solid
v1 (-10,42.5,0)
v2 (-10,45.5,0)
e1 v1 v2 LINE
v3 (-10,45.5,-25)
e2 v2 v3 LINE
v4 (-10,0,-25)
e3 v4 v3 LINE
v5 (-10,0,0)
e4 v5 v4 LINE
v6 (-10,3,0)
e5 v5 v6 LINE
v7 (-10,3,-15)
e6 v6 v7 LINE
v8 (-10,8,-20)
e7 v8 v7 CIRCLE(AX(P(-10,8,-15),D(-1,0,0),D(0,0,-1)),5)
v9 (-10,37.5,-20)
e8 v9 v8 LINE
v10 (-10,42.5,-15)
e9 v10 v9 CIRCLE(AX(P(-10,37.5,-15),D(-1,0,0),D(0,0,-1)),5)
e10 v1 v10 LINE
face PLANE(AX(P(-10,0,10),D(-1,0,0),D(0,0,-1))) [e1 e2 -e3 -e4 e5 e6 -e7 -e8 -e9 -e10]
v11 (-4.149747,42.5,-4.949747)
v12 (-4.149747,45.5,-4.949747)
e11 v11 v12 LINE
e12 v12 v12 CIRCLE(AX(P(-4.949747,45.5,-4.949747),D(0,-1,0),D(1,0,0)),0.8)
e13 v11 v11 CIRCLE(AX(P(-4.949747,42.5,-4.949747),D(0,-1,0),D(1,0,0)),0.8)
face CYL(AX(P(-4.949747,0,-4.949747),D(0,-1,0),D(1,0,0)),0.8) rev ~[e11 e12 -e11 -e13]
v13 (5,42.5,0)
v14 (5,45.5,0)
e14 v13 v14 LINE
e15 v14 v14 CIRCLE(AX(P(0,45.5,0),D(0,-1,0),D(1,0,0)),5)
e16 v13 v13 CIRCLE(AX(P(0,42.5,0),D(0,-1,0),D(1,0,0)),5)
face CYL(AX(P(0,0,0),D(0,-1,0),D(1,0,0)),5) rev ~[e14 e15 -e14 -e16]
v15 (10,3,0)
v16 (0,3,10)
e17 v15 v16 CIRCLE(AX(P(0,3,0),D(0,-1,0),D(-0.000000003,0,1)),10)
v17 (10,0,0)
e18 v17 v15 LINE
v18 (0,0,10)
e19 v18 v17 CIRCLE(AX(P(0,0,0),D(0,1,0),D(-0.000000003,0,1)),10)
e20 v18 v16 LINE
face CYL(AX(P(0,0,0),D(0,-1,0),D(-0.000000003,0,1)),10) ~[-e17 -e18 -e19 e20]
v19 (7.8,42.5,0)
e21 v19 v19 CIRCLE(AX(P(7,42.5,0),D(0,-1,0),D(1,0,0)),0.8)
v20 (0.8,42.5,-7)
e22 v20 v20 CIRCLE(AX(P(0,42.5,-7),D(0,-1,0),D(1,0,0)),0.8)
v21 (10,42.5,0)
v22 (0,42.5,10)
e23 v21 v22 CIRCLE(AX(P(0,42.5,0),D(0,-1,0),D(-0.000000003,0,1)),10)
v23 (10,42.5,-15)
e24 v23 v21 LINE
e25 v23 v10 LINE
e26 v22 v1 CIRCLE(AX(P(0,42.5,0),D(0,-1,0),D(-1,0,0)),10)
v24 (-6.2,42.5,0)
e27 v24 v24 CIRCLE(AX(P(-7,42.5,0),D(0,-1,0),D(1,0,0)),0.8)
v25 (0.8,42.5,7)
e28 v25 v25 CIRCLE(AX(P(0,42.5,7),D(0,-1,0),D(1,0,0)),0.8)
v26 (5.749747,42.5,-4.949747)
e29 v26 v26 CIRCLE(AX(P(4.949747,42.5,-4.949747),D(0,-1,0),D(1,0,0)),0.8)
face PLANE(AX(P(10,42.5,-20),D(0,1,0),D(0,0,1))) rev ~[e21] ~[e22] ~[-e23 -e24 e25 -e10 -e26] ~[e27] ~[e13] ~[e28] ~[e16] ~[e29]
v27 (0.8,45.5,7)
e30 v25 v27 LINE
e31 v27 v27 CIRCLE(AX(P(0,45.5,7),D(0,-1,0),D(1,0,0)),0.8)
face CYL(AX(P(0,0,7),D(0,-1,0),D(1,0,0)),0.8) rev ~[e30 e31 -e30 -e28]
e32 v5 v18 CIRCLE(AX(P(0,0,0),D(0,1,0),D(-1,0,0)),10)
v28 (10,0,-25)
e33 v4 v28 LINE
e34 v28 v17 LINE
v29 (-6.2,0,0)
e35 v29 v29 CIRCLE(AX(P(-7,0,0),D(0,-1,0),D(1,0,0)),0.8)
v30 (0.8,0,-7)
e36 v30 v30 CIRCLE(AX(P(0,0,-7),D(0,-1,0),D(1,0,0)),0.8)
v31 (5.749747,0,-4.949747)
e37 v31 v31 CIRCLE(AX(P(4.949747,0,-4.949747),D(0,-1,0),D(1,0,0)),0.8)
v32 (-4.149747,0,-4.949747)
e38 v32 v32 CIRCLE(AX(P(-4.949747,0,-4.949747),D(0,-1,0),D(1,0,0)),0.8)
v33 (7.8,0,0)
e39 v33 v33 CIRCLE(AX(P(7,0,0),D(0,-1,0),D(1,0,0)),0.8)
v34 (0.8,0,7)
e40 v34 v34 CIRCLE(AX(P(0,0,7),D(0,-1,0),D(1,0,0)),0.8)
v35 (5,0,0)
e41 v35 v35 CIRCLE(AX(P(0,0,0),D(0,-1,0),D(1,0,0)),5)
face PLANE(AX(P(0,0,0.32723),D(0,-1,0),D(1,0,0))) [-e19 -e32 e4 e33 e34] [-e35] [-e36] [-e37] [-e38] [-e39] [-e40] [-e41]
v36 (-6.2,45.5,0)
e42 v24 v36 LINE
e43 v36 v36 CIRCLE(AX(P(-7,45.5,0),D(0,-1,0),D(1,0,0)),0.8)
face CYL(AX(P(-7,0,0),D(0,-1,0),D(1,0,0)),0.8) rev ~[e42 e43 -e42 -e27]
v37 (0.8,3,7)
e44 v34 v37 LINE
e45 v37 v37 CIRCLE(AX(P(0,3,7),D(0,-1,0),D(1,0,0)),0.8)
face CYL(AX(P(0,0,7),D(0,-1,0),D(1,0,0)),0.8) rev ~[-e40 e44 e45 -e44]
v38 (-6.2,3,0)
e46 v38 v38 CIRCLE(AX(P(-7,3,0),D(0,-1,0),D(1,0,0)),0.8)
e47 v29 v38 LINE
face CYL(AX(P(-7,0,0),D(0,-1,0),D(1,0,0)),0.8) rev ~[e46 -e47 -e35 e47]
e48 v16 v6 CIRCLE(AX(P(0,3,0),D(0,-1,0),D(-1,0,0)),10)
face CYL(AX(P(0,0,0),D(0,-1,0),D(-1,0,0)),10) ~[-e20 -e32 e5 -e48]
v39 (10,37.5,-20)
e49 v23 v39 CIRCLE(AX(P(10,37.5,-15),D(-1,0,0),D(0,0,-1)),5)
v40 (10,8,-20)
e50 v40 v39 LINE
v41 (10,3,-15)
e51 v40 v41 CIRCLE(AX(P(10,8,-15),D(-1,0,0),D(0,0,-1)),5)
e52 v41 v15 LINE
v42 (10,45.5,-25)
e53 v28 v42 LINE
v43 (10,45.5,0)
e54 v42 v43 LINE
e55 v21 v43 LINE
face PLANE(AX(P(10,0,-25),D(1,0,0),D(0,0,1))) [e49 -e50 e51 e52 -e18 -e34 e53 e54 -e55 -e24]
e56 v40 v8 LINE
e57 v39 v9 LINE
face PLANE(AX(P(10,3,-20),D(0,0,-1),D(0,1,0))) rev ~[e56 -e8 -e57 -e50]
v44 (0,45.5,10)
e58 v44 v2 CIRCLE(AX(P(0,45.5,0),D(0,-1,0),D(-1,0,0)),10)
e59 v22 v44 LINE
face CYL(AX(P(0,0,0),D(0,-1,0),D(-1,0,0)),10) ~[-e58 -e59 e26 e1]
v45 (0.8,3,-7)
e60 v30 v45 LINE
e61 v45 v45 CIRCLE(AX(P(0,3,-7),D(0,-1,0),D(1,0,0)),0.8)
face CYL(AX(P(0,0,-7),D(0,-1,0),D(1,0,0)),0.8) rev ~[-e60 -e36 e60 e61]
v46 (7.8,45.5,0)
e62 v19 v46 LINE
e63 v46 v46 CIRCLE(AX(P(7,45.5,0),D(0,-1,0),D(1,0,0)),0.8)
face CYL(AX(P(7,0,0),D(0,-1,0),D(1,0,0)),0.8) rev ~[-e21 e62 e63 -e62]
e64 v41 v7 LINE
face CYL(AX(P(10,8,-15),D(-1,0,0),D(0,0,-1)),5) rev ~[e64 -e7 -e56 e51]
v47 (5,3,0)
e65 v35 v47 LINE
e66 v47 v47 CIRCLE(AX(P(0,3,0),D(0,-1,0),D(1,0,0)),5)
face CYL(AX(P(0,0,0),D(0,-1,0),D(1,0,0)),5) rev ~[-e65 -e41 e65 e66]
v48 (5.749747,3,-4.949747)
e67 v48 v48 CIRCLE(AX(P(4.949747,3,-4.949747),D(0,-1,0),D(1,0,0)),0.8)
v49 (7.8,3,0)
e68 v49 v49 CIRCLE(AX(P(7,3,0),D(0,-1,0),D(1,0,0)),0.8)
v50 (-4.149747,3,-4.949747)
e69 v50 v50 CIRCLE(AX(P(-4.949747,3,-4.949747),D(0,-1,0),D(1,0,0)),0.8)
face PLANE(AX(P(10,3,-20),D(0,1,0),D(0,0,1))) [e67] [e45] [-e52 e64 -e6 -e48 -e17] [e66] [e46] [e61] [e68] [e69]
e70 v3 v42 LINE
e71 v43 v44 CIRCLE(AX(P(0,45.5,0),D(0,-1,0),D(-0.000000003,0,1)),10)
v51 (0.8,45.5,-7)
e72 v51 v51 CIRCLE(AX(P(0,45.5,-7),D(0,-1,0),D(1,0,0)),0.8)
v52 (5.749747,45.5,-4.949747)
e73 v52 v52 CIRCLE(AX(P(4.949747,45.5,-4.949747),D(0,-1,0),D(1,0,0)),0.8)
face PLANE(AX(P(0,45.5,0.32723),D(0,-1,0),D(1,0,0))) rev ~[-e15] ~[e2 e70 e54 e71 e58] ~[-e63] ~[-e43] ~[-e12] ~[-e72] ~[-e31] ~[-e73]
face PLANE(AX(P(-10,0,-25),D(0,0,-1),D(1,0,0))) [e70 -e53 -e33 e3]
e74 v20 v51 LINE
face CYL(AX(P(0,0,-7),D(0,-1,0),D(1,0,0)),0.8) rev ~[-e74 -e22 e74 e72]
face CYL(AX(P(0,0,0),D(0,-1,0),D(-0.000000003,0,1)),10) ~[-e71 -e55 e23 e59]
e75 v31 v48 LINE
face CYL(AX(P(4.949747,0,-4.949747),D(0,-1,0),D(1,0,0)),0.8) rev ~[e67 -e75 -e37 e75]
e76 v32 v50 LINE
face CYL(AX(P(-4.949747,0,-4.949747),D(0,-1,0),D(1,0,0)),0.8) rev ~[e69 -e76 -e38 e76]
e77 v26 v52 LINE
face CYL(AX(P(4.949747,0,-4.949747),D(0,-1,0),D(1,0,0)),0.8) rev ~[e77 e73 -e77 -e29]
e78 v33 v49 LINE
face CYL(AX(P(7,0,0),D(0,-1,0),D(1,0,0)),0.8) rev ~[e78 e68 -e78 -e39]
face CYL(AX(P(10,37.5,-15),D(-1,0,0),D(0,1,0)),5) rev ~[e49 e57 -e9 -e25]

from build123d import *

# Parameters (mm, degrees)
F0_R     = 0.8
F0_R_2   = 5
F1_DEPTH = 45.5
F2_W     = 39.5
F2_H     = 30
F3_DEPTH = 20.001
F4_DEPTH = 45.501
F5_R     = 5


with BuildPart() as f1:
    # F0 (on Front) → F1 (new body)
    with BuildSketch(Plane.XZ):
        with BuildLine():
            ThreePointArc((-2.67e-08, 10), (-7.0710678213, 7.0710678024), (-10, 0))
            ThreePointArc((-10, 0), (0, -10), (10, 0))
            ThreePointArc((10, 0), (7.0710678024, 7.0710678213), (-2.67e-08, 10))
        make_face()
        with Locations((-7, 0)):
            Circle(F0_R, mode=Mode.SUBTRACT)
        with Locations((-4.9497474683, -4.9497474683)):
            Circle(F0_R, mode=Mode.SUBTRACT)
        with Locations((0, -7)):
            Circle(F0_R, mode=Mode.SUBTRACT)
        with Locations((4.9497474683, -4.9497474683)):
            Circle(F0_R, mode=Mode.SUBTRACT)
        Circle(F0_R_2, mode=Mode.SUBTRACT)
        with Locations((7, 0)):
            Circle(F0_R, mode=Mode.SUBTRACT)
        with Locations((0, 7)):
            Circle(F0_R, mode=Mode.SUBTRACT)
        with BuildLine():
            ThreePointArc((10, 0), (0, -10), (-10, 0))
            Line((-10, 0), (-10, -22))
            Line((-10, -22), (10, -22))
            Line((10, -22), (10, 0))
        make_face()
        Circle(F0_R_2)
        Polygon((10, -22), (-10, -22), (-10, -25), (0, -25), (10, -25), align=None)
        with BuildLine():
            ThreePointArc((-2.67e-08, 10), (7.0710678024, 7.0710678213), (10, 0))
            Line((10, 0), (10, 10))
            Line((10, 10), (-2.67e-08, 10))
        make_face()
        with BuildLine():
            Line((-10, 10), (-10, 0))
            ThreePointArc((-10, 0), (-7.0710678213, 7.0710678024), (-2.67e-08, 10))
            Line((-2.67e-08, 10), (-10, 10))
        make_face()
        with Locations((0, -7)):
            Circle(F0_R)
        with Locations((7, 0)):
            Circle(F0_R)
        with Locations((-4.9497474683, -4.9497474683)):
            Circle(F0_R)
        with Locations((-7, 0)):
            Circle(F0_R)
        with Locations((0, 7)):
            Circle(F0_R)
        with Locations((4.9497474683, -4.9497474683)):
            Circle(F0_R)
    extrude(amount=-F1_DEPTH)

    # F2 (on face) → F3 (cut, through all)
    with BuildSketch(Plane.YZ.offset(10)):
        with Locations((22.75, -5)):
            Rectangle(F2_W, F2_H)
    extrude(amount=-F3_DEPTH, mode=Mode.SUBTRACT)

    # F0 (on Front) → F4 (cut, through all)
    with BuildSketch(Plane.XZ):
        Circle(F0_R_2)
        with BuildLine():
            Line((-10, 10), (-10, 0))
            ThreePointArc((-10, 0), (-7.0710678213, 7.0710678024), (-2.67e-08, 10))
            Line((-2.67e-08, 10), (-10, 10))
        make_face()
        with BuildLine():
            ThreePointArc((-2.67e-08, 10), (7.0710678024, 7.0710678213), (10, 0))
            Line((10, 0), (10, 10))
            Line((10, 10), (-2.67e-08, 10))
        make_face()
        with Locations((7, 0)):
            Circle(F0_R)
        with Locations((0, 7)):
            Circle(F0_R)
        with Locations((-7, 0)):
            Circle(F0_R)
        with Locations((-4.9497474683, -4.9497474683)):
            Circle(F0_R)
        with Locations((0, -7)):
            Circle(F0_R)
        with Locations((4.9497474683, -4.9497474683)):
            Circle(F0_R)
    extrude(amount=-F4_DEPTH, mode=Mode.SUBTRACT)

    # F5
    f5_edges = [f1.edges().sort_by_distance(p)[0] for p in [
        (0, 42.5, -20),
        (0, 3, -20),
    ]]
    fillet(f5_edges, radius=F5_R)


solid = f1.part
